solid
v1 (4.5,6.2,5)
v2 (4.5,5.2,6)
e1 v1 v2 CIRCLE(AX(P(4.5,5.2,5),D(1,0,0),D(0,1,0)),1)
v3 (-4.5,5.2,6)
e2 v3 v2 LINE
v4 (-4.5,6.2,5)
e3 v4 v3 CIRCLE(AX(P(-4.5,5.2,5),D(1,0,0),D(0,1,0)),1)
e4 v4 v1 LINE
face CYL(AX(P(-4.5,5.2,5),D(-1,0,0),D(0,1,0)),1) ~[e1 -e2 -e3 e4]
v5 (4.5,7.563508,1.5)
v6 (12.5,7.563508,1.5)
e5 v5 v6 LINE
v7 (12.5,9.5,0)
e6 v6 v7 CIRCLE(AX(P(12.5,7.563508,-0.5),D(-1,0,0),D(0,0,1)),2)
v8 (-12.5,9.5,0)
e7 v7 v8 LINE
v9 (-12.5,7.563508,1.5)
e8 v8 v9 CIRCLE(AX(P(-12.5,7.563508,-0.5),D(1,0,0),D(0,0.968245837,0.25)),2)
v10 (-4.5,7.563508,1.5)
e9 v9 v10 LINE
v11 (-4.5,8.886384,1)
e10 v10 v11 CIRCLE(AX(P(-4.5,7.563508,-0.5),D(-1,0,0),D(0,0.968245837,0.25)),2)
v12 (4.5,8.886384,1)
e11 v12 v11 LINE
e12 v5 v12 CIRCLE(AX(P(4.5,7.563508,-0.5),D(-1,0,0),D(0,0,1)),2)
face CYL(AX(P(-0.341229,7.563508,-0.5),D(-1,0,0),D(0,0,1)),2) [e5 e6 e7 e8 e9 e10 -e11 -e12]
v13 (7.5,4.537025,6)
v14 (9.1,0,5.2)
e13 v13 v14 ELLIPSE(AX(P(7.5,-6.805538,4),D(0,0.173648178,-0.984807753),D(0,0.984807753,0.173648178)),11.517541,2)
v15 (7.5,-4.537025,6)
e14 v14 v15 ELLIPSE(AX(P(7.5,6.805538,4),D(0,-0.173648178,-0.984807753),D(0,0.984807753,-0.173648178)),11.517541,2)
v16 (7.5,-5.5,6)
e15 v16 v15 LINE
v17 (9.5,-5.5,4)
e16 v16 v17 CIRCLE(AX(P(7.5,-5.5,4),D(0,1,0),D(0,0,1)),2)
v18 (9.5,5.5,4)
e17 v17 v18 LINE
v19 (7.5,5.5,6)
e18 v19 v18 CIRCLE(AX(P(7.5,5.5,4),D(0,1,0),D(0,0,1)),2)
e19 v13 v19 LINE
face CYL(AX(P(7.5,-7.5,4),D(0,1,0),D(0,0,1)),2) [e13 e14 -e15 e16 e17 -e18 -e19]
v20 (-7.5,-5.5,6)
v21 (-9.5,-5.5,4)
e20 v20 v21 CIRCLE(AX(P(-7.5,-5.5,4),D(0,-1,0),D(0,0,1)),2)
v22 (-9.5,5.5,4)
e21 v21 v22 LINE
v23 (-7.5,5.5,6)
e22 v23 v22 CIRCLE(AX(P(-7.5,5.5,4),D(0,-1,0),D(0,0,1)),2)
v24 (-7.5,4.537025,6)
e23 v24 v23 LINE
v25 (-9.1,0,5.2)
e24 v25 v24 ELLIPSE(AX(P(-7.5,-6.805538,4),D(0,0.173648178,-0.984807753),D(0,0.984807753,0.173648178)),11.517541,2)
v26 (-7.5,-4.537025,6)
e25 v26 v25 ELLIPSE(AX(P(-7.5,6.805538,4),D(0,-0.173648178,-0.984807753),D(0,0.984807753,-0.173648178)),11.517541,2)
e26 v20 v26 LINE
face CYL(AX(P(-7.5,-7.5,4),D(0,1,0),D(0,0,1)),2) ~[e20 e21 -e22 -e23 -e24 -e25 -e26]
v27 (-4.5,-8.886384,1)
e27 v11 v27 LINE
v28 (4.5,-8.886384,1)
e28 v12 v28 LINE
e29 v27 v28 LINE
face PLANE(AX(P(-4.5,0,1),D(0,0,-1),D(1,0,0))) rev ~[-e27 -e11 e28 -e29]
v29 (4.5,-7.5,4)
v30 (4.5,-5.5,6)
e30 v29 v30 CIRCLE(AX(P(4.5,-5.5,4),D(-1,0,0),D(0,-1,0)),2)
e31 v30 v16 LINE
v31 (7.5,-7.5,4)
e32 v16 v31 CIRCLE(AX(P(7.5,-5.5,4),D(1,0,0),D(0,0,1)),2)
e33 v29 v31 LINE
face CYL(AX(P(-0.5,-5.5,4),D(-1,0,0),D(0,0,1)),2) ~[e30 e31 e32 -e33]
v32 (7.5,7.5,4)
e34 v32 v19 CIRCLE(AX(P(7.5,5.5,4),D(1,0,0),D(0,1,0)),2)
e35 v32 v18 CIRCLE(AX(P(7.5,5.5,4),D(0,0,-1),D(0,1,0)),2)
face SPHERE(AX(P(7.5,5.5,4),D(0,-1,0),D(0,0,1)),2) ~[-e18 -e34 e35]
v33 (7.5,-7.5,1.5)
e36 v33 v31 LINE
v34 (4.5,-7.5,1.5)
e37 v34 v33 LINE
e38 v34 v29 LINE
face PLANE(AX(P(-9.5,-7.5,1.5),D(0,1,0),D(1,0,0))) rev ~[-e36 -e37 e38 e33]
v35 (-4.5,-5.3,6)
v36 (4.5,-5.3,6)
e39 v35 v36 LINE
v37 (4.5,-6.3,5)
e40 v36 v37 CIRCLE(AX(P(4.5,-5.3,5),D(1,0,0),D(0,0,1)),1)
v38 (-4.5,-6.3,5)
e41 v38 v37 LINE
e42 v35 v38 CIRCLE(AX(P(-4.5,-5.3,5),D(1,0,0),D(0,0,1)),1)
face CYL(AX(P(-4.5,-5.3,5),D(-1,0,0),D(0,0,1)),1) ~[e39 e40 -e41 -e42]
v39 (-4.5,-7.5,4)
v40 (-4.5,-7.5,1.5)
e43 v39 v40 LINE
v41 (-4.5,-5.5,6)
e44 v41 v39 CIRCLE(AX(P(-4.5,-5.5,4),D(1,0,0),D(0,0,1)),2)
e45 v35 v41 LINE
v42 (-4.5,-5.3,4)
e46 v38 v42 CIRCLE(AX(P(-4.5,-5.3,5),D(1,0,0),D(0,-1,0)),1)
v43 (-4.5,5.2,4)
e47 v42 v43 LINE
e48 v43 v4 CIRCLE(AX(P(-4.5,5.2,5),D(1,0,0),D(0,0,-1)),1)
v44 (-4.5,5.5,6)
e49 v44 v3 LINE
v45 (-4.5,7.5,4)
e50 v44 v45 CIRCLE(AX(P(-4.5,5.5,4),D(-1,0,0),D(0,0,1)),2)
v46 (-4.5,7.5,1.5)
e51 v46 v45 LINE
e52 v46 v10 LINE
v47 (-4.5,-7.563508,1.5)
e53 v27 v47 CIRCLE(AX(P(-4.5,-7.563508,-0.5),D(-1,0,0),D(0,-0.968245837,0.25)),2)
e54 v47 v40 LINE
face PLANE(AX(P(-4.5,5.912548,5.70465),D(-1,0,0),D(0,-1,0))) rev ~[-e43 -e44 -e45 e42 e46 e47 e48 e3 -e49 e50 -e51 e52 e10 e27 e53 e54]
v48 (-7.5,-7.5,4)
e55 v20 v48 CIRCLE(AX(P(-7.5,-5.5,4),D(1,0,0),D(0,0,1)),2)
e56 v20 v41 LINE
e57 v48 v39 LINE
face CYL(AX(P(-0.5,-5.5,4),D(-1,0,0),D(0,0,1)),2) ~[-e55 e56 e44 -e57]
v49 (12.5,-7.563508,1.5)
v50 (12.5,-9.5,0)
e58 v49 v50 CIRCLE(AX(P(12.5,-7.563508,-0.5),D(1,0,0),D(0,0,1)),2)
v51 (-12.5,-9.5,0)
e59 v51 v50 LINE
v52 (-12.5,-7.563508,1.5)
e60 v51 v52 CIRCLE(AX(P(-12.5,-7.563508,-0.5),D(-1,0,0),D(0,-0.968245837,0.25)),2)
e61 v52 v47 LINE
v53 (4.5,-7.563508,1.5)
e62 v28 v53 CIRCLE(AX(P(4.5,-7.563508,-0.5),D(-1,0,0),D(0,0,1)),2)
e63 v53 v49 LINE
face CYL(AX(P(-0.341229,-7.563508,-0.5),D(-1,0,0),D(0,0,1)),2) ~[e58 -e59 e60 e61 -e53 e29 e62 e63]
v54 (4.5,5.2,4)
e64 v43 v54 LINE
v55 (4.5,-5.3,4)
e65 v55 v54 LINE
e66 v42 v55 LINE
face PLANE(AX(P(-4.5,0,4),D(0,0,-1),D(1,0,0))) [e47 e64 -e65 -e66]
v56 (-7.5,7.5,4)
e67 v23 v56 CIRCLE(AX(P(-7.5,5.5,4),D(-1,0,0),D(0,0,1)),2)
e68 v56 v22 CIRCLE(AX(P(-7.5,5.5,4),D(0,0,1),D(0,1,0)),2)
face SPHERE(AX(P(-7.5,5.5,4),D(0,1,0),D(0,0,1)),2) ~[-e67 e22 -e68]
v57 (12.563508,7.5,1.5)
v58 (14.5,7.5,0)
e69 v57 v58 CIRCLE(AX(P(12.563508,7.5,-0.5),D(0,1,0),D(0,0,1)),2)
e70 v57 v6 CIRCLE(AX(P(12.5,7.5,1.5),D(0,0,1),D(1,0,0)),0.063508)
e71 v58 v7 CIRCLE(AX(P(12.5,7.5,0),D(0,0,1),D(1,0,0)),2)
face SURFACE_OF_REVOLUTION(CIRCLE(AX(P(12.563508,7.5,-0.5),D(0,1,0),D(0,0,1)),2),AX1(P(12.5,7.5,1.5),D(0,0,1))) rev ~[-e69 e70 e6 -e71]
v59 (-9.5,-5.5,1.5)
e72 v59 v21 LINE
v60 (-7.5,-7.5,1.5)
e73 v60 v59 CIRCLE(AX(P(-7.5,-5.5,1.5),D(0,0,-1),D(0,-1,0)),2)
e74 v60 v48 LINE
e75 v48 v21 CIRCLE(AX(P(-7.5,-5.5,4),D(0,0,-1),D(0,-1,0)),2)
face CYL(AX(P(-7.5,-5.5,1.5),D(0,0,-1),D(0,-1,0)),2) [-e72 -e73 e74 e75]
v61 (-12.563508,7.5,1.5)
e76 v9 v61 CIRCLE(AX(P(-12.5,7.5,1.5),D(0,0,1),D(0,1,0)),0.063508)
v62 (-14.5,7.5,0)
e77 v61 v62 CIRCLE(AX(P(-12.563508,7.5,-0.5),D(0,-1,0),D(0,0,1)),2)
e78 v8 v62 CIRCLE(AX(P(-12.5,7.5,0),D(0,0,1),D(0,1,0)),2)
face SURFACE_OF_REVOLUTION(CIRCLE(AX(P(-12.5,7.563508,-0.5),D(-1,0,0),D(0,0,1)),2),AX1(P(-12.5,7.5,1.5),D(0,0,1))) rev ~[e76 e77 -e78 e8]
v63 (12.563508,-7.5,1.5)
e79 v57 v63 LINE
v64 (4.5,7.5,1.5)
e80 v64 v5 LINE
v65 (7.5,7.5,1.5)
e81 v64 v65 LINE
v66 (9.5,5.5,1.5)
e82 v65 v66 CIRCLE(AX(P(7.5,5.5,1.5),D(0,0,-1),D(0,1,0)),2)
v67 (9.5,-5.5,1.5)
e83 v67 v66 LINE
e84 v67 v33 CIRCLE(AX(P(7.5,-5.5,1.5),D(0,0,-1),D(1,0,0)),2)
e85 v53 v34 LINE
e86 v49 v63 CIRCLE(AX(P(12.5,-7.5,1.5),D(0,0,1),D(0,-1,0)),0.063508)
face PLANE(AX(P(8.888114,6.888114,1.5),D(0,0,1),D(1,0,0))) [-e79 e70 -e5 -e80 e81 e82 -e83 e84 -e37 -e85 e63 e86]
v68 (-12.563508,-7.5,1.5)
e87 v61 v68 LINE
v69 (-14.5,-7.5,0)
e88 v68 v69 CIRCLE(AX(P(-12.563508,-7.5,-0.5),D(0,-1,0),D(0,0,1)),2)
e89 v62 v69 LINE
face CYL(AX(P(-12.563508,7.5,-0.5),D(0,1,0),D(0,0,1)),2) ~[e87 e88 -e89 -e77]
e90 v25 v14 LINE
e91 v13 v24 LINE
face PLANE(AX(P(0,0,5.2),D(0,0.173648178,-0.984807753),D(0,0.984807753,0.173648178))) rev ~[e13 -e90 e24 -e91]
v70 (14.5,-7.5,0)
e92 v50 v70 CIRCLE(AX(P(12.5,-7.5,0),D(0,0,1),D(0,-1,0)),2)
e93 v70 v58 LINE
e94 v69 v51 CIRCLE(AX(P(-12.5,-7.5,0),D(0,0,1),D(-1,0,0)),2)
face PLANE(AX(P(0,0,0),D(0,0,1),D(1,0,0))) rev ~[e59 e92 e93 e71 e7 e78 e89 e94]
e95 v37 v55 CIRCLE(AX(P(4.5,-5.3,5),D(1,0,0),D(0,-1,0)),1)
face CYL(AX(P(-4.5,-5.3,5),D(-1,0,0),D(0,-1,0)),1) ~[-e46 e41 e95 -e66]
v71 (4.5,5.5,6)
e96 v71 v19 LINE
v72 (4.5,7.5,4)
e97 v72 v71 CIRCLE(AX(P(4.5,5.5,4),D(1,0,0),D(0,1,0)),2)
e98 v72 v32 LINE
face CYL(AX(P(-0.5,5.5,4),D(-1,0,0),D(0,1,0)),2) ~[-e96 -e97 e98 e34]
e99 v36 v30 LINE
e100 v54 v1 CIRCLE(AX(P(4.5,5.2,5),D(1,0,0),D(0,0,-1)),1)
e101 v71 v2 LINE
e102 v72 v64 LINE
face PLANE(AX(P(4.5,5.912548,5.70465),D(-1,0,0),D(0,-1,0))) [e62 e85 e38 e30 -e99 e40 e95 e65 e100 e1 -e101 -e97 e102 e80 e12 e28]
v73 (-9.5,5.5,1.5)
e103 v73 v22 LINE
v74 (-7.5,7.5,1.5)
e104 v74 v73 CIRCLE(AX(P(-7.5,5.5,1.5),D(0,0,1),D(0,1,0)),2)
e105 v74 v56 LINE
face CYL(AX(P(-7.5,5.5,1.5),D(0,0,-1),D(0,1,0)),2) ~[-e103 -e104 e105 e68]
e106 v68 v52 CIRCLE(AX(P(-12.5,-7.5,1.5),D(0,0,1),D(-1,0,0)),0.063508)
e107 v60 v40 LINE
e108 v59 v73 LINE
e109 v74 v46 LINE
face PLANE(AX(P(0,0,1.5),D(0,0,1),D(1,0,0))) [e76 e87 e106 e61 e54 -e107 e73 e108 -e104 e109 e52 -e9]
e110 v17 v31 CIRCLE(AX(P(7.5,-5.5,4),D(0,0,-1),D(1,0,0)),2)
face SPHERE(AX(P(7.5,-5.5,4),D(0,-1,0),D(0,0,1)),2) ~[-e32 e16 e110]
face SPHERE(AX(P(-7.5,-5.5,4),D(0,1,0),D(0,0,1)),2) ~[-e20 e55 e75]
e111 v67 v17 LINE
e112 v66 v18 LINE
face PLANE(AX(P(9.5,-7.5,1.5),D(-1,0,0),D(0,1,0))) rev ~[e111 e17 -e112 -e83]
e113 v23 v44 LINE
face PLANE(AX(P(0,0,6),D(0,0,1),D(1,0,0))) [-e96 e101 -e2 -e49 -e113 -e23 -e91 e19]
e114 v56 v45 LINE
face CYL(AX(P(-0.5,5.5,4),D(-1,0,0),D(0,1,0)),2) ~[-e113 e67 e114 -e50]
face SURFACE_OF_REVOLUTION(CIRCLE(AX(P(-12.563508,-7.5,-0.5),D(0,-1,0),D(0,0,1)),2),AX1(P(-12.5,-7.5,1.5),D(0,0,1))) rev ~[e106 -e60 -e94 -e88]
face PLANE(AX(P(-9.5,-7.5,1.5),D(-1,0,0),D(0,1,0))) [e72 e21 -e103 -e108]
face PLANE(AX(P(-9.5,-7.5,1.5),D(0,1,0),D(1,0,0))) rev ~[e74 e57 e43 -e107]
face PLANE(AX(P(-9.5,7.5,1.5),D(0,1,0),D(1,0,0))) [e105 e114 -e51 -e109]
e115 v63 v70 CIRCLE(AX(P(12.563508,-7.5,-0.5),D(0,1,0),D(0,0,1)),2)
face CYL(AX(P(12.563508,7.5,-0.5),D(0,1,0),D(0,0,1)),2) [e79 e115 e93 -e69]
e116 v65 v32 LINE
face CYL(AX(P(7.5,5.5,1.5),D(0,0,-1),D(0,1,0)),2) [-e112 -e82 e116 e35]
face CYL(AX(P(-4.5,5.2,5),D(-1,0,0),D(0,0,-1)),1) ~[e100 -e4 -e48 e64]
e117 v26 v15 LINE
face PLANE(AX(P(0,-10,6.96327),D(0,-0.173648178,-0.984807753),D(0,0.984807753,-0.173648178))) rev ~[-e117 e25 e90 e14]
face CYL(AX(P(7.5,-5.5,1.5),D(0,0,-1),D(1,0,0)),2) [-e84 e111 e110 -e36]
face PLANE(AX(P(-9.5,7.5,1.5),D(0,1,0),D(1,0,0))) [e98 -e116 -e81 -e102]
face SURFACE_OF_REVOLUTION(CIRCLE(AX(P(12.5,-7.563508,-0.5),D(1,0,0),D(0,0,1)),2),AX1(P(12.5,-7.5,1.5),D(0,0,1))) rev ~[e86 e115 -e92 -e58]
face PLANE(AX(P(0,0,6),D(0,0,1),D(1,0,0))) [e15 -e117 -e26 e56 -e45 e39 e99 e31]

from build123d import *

# Parameters (mm, degrees)
F1_DEPTH      = 1.5
F2_W          = 19
F2_H          = 15
F3_DEPTH      = 4.5
F4_W          = 9
F4_H          = 3
F5_DEPTH      = 12.5
F6_W          = 9
F6_H          = 2
F7_DEPTH      = 1.2
F8_W          = 9
F8_H          = 2
F9_DEPTH      = 1.3
F10_R         = 2
F11_T1_DEPTH  = 8
F11_T3_DEPTH  = 2.5
F11_T5_DEPTH  = 8
F11_T7_DEPTH  = 15
F11_T9_DEPTH  = 12.8412291828
F11_T11_DEPTH = 12.8412291828
F11_T14_ANGLE = 90
F11_T16_ANGLE = 90
F11_T18_ANGLE = 90
F11_T20_ANGLE = 90
F11_T22_ANGLE = 90
F11_T24_ANGLE = 90
F11_T26_ANGLE = 90
F11_T28_ANGLE = 90
F12_T1_DEPTH  = 9
F14_DEPTH     = 12.5


# Not quite as in the source:
# - a fillet or chamfer that OpenCascade refuses, or shapes differently, is made with other operations: its cross-section is extruded or revolved along the edge and cut away or added


with BuildPart() as f1:
    # F0 (on Top) → F1 (new body)
    with BuildSketch(Plane.XY):
        with BuildLine():
            Line((12.5, 9.5), (-12.5, 9.5))
            ThreePointArc((-12.5, 9.5), (-13.9142135624, 8.9142135624), (-14.5, 7.5))
            Line((-14.5, 7.5), (-14.5, -7.5))
            ThreePointArc((-14.5, -7.5), (-13.9142135624, -8.9142135624), (-12.5, -9.5))
            Line((-12.5, -9.5), (12.5, -9.5))
            ThreePointArc((12.5, -9.5), (13.9142135624, -8.9142135624), (14.5, -7.5))
            Line((14.5, -7.5), (14.5, 7.5))
            ThreePointArc((14.5, 7.5), (13.9142135624, 8.9142135624), (12.5, 9.5))
        make_face()
    extrude(amount=F1_DEPTH)

    # F2 (on face) → F3 (join)
    with BuildSketch(Plane.XY.offset(1.5)):
        Rectangle(F2_W, F2_H)
    extrude(amount=F3_DEPTH)

    # F4 (on Front) → F5 (cut, symmetric)
    with BuildSketch(Plane.XZ):
        with Locations((0, 2.5)):
            Rectangle(F4_W, F4_H)
    extrude(amount=F5_DEPTH, both=True, mode=Mode.SUBTRACT)

    # F6 (on face) → F7 (cut)
    with BuildSketch(Plane.XZ.offset(7.5)):
        with Locations((0, 5)):
            Rectangle(F6_W, F6_H)
    extrude(amount=-F7_DEPTH, mode=Mode.SUBTRACT)

    # F8 (on face) → F9 (cut)
    with BuildSketch(Plane(origin=(0, 7.5, 0), x_dir=(-1, 0, 0), z_dir=(0, 1, 0))):
        with Locations((0, 5)):
            Rectangle(F8_W, F8_H)
    extrude(amount=-F9_DEPTH, mode=Mode.SUBTRACT)

    # F10
    f10_edges = [f1.edges().sort_by_distance(p)[0] for p in [
        (9.5, 0, 6),
        (-9.5, 0, 6),
    ]]
    fillet(f10_edges, radius=F10_R)

    # F11: fillet of radius 2 on 18 edges, made by hand

    # F11_s2 → F11_t1 (cut)
    with BuildSketch(Plane.YZ.offset(-0.5)):
        with BuildLine():
            ThreePointArc((7.5, 4), (6.9142135624, 5.4142135624), (5.5, 6))
            Line((5.5, 6), (7.5, 6))
            Line((7.5, 6), (7.5, 4))
        make_face()
        with BuildLine():
            ThreePointArc((-5.5, 6), (-6.9142135624, 5.4142135624), (-7.5, 4))
            Line((-7.5, 4), (-7.5, 6))
            Line((-7.5, 6), (-5.5, 6))
        make_face()
    extrude(amount=F11_T1_DEPTH, mode=Mode.SUBTRACT)

    # F11_s4 → F11_t3 (cut)
    with BuildSketch(Plane.XY.offset(1.5)):
        with BuildLine():
            ThreePointArc((7.5, 7.5), (8.9142135624, 6.9142135624), (9.5, 5.5))
            Line((9.5, 5.5), (9.5, 7.5))
            Line((9.5, 7.5), (7.5, 7.5))
        make_face()
        with BuildLine():
            ThreePointArc((-7.5, 7.5), (-8.9142135624, 6.9142135624), (-9.5, 5.5))
            Line((-9.5, 5.5), (-9.5, 7.5))
            Line((-9.5, 7.5), (-7.5, 7.5))
        make_face()
        with BuildLine():
            ThreePointArc((9.5, -5.5), (8.9142135624, -6.9142135624), (7.5, -7.5))
            Line((7.5, -7.5), (9.5, -7.5))
            Line((9.5, -7.5), (9.5, -5.5))
        make_face()
        with BuildLine():
            ThreePointArc((-7.5, -7.5), (-8.9142135624, -6.9142135624), (-9.5, -5.5))
            Line((-9.5, -5.5), (-9.5, -7.5))
            Line((-9.5, -7.5), (-7.5, -7.5))
        make_face()
    extrude(amount=F11_T3_DEPTH, mode=Mode.SUBTRACT)

    # F11_s6 → F11_t5 (cut)
    with BuildSketch(Plane.YZ.offset(-7.5)):
        with BuildLine():
            ThreePointArc((5.5, 6), (6.9142135624, 5.4142135624), (7.5, 4))
            Line((7.5, 4), (7.5, 6))
            Line((7.5, 6), (5.5, 6))
        make_face()
        with BuildLine():
            ThreePointArc((-5.5, 6), (-6.9142135624, 5.4142135624), (-7.5, 4))
            Line((-7.5, 4), (-7.5, 6))
            Line((-7.5, 6), (-5.5, 6))
        make_face()
    extrude(amount=F11_T5_DEPTH, mode=Mode.SUBTRACT)

    # F11_s8 → F11_t7 (cut)
    with BuildSketch(Plane.XZ.offset(-7.5)):
        with BuildLine():
            ThreePointArc((12.5635083269, 1.5), (13.7882531983, 1.0811388301), (14.5, 0))
            Line((14.5, 0), (14.5, 1.5))
            Line((14.5, 1.5), (12.5635083269, 1.5))
        make_face()
        with BuildLine():
            ThreePointArc((-12.5635083269, 1.5), (-13.7882531983, 1.0811388301), (-14.5, 0))
            Line((-14.5, 0), (-14.5, 1.5))
            Line((-14.5, 1.5), (-12.5635083269, 1.5))
        make_face()
    extrude(amount=F11_T7_DEPTH, mode=Mode.SUBTRACT)

    # F11_s10 → F11_t9 (cut)
    with BuildSketch(Plane.YZ.offset(-0.3412291828)):
        with BuildLine():
            ThreePointArc((-7.5635083269, 1.5), (-8.7882531983, 1.0811388301), (-9.5, 0))
            Line((-9.5, 0), (-9.5, 1.5))
            Line((-9.5, 1.5), (-7.5635083269, 1.5))
        make_face()
        with BuildLine():
            ThreePointArc((7.5635083269, 1.5), (8.7882531983, 1.0811388301), (9.5, 0))
            Line((9.5, 0), (9.5, 1.5))
            Line((9.5, 1.5), (7.5635083269, 1.5))
        make_face()
    extrude(amount=F11_T9_DEPTH, mode=Mode.SUBTRACT)

    # F11_s12 → F11_t11 (cut)
    with BuildSketch(Plane.YZ.offset(-12.5)):
        with BuildLine():
            ThreePointArc((-9.5, 0), (-8.7882531983, 1.0811388301), (-7.5635083269, 1.5))
            Line((-7.5635083269, 1.5), (-9.5, 1.5))
            Line((-9.5, 1.5), (-9.5, 0))
        make_face()
        with BuildLine():
            ThreePointArc((9.5, 0), (8.7882531983, 1.0811388301), (7.5635083269, 1.5))
            Line((7.5635083269, 1.5), (9.5, 1.5))
            Line((9.5, 1.5), (9.5, 0))
        make_face()
    extrude(amount=F11_T11_DEPTH, mode=Mode.SUBTRACT)

    # F11_s13 → F11_t14 (revolve, cut)
    with BuildSketch(Plane.YZ.offset(7.5)):
        with BuildLine():
            ThreePointArc((7.5, 4), (6.9142135624, 5.4142135624), (5.5, 6))
            Line((5.5, 6), (7.5, 6))
            Line((7.5, 6), (7.5, 4))
        make_face()
    revolve(axis=Axis((7.5, 7.5, 4), (0, 1, 0)), revolution_arc=F11_T14_ANGLE, mode=Mode.SUBTRACT)

    # F11_s15 → F11_t16 (revolve, cut)
    with BuildSketch(Plane.YZ.offset(-7.5)):
        with BuildLine():
            ThreePointArc((5.5, 6), (6.9142135624, 5.4142135624), (7.5, 4))
            Line((7.5, 4), (7.5, 6))
            Line((7.5, 6), (5.5, 6))
        make_face()
    revolve(axis=Axis((-7.5, 7.5, 4), (0, -1, 0)), revolution_arc=F11_T16_ANGLE, mode=Mode.SUBTRACT)

    # F11_s17 → F11_t18 (revolve, cut)
    with BuildSketch(Plane.YZ.offset(7.5)):
        with BuildLine():
            ThreePointArc((-5.5, 6), (-6.9142135624, 5.4142135624), (-7.5, 4))
            Line((-7.5, 4), (-7.5, 6))
            Line((-7.5, 6), (-5.5, 6))
        make_face()
    revolve(axis=Axis((7.5, -7.5, 4), (0, 1, 0)), revolution_arc=F11_T18_ANGLE, mode=Mode.SUBTRACT)

    # F11_s19 → F11_t20 (revolve, cut)
    with BuildSketch(Plane.YZ.offset(-7.5)):
        with BuildLine():
            ThreePointArc((-7.5, 4), (-6.9142135624, 5.4142135624), (-5.5, 6))
            Line((-5.5, 6), (-7.5, 6))
            Line((-7.5, 6), (-7.5, 4))
        make_face()
    revolve(axis=Axis((-7.5, -7.5, 4), (0, -1, 0)), revolution_arc=F11_T20_ANGLE, mode=Mode.SUBTRACT)

    # F11_s21 → F11_t22 (revolve, cut)
    with BuildSketch(Plane.YZ.offset(-12.5)):
        with BuildLine():
            ThreePointArc((7.5635083269, 1.5), (8.7882531983, 1.0811388301), (9.5, 0))
            Line((9.5, 0), (9.5, 1.5))
            Line((9.5, 1.5), (7.5635083269, 1.5))
        make_face()
    revolve(axis=Axis((-12.5, 7.5, 1.5), (0, 0, 1)), revolution_arc=F11_T22_ANGLE, mode=Mode.SUBTRACT)

    # F11_s23 → F11_t24 (revolve, cut)
    with BuildSketch(Plane.XZ.offset(-7.5)):
        with BuildLine():
            ThreePointArc((12.5635083269, 1.5), (13.7882531983, 1.0811388301), (14.5, 0))
            Line((14.5, 0), (14.5, 1.5))
            Line((14.5, 1.5), (12.5635083269, 1.5))
        make_face()
    revolve(axis=Axis((12.5, 7.5, 1.5), (0, 0, 1)), revolution_arc=F11_T24_ANGLE, mode=Mode.SUBTRACT)

    # F11_s25 → F11_t26 (revolve, cut)
    with BuildSketch(Plane.XZ.offset(7.5)):
        with BuildLine():
            ThreePointArc((-12.5635083269, 1.5), (-13.7882531983, 1.0811388301), (-14.5, 0))
            Line((-14.5, 0), (-14.5, 1.5))
            Line((-14.5, 1.5), (-12.5635083269, 1.5))
        make_face()
    revolve(axis=Axis((-12.5, -7.5, 1.5), (0, 0, 1)), revolution_arc=F11_T26_ANGLE, mode=Mode.SUBTRACT)

    # F11_s27 → F11_t28 (revolve, cut)
    with BuildSketch(Plane.YZ.offset(12.5)):
        with BuildLine():
            ThreePointArc((-7.5635083269, 1.5), (-8.7882531983, 1.0811388301), (-9.5, 0))
            Line((-9.5, 0), (-9.5, 1.5))
            Line((-9.5, 1.5), (-7.5635083269, 1.5))
        make_face()
    revolve(axis=Axis((12.5, -7.5, 1.5), (0, 0, 1)), revolution_arc=F11_T28_ANGLE, mode=Mode.SUBTRACT)

    # F12: fillet of radius 1 on 4 edges, made by hand

    # F12_s2 → F12_t1 (cut)
    with BuildSketch(Plane.YZ.offset(-4.5)):
        with BuildLine():
            ThreePointArc((-6.3, 5), (-6.0071067812, 4.2928932188), (-5.3, 4))
            Line((-5.3, 4), (-6.3, 4))
            Line((-6.3, 4), (-6.3, 5))
        make_face()
        with BuildLine():
            ThreePointArc((5.2, 4), (5.9071067812, 4.2928932188), (6.2, 5))
            Line((6.2, 5), (6.2, 4))
            Line((6.2, 4), (5.2, 4))
        make_face()
        with BuildLine():
            ThreePointArc((6.2, 5), (5.9071067812, 5.7071067812), (5.2, 6))
            Line((5.2, 6), (5.2, 6.1))
            ThreePointArc((5.2, 6.1), (5.5, 6.1), (6.235, 5.9671743695))
            Line((6.235, 5.9671743695), (6.3, 5.8734993995))
            Line((6.3, 5.8734993995), (6.3, 5))
            Line((6.3, 5), (6.2, 5))
        make_face()
        with BuildLine():
            ThreePointArc((-5.3, 6), (-6.0071067812, 5.7071067812), (-6.3, 5))
            Line((-6.3, 5), (-6.4, 5))
            Line((-6.4, 5), (-6.4, 5.833030278))
            Line((-6.4, 5.833030278), (-6.34, 5.9246817919))
            ThreePointArc((-6.34, 5.9246817919), (-5.5, 6.1), (-5.3, 6.1))
            Line((-5.3, 6.1), (-5.3, 6))
        make_face()
    extrude(amount=F12_T1_DEPTH, mode=Mode.SUBTRACT)

    # F13 (on Right) → F14 (cut, symmetric)
    with BuildSketch(Plane.YZ):
        Polygon((-10, 6.9632698071), (0, 5.2), (10, 6.9632698071), align=None)
    extrude(amount=F14_DEPTH, both=True, mode=Mode.SUBTRACT)


solid = f1.part
